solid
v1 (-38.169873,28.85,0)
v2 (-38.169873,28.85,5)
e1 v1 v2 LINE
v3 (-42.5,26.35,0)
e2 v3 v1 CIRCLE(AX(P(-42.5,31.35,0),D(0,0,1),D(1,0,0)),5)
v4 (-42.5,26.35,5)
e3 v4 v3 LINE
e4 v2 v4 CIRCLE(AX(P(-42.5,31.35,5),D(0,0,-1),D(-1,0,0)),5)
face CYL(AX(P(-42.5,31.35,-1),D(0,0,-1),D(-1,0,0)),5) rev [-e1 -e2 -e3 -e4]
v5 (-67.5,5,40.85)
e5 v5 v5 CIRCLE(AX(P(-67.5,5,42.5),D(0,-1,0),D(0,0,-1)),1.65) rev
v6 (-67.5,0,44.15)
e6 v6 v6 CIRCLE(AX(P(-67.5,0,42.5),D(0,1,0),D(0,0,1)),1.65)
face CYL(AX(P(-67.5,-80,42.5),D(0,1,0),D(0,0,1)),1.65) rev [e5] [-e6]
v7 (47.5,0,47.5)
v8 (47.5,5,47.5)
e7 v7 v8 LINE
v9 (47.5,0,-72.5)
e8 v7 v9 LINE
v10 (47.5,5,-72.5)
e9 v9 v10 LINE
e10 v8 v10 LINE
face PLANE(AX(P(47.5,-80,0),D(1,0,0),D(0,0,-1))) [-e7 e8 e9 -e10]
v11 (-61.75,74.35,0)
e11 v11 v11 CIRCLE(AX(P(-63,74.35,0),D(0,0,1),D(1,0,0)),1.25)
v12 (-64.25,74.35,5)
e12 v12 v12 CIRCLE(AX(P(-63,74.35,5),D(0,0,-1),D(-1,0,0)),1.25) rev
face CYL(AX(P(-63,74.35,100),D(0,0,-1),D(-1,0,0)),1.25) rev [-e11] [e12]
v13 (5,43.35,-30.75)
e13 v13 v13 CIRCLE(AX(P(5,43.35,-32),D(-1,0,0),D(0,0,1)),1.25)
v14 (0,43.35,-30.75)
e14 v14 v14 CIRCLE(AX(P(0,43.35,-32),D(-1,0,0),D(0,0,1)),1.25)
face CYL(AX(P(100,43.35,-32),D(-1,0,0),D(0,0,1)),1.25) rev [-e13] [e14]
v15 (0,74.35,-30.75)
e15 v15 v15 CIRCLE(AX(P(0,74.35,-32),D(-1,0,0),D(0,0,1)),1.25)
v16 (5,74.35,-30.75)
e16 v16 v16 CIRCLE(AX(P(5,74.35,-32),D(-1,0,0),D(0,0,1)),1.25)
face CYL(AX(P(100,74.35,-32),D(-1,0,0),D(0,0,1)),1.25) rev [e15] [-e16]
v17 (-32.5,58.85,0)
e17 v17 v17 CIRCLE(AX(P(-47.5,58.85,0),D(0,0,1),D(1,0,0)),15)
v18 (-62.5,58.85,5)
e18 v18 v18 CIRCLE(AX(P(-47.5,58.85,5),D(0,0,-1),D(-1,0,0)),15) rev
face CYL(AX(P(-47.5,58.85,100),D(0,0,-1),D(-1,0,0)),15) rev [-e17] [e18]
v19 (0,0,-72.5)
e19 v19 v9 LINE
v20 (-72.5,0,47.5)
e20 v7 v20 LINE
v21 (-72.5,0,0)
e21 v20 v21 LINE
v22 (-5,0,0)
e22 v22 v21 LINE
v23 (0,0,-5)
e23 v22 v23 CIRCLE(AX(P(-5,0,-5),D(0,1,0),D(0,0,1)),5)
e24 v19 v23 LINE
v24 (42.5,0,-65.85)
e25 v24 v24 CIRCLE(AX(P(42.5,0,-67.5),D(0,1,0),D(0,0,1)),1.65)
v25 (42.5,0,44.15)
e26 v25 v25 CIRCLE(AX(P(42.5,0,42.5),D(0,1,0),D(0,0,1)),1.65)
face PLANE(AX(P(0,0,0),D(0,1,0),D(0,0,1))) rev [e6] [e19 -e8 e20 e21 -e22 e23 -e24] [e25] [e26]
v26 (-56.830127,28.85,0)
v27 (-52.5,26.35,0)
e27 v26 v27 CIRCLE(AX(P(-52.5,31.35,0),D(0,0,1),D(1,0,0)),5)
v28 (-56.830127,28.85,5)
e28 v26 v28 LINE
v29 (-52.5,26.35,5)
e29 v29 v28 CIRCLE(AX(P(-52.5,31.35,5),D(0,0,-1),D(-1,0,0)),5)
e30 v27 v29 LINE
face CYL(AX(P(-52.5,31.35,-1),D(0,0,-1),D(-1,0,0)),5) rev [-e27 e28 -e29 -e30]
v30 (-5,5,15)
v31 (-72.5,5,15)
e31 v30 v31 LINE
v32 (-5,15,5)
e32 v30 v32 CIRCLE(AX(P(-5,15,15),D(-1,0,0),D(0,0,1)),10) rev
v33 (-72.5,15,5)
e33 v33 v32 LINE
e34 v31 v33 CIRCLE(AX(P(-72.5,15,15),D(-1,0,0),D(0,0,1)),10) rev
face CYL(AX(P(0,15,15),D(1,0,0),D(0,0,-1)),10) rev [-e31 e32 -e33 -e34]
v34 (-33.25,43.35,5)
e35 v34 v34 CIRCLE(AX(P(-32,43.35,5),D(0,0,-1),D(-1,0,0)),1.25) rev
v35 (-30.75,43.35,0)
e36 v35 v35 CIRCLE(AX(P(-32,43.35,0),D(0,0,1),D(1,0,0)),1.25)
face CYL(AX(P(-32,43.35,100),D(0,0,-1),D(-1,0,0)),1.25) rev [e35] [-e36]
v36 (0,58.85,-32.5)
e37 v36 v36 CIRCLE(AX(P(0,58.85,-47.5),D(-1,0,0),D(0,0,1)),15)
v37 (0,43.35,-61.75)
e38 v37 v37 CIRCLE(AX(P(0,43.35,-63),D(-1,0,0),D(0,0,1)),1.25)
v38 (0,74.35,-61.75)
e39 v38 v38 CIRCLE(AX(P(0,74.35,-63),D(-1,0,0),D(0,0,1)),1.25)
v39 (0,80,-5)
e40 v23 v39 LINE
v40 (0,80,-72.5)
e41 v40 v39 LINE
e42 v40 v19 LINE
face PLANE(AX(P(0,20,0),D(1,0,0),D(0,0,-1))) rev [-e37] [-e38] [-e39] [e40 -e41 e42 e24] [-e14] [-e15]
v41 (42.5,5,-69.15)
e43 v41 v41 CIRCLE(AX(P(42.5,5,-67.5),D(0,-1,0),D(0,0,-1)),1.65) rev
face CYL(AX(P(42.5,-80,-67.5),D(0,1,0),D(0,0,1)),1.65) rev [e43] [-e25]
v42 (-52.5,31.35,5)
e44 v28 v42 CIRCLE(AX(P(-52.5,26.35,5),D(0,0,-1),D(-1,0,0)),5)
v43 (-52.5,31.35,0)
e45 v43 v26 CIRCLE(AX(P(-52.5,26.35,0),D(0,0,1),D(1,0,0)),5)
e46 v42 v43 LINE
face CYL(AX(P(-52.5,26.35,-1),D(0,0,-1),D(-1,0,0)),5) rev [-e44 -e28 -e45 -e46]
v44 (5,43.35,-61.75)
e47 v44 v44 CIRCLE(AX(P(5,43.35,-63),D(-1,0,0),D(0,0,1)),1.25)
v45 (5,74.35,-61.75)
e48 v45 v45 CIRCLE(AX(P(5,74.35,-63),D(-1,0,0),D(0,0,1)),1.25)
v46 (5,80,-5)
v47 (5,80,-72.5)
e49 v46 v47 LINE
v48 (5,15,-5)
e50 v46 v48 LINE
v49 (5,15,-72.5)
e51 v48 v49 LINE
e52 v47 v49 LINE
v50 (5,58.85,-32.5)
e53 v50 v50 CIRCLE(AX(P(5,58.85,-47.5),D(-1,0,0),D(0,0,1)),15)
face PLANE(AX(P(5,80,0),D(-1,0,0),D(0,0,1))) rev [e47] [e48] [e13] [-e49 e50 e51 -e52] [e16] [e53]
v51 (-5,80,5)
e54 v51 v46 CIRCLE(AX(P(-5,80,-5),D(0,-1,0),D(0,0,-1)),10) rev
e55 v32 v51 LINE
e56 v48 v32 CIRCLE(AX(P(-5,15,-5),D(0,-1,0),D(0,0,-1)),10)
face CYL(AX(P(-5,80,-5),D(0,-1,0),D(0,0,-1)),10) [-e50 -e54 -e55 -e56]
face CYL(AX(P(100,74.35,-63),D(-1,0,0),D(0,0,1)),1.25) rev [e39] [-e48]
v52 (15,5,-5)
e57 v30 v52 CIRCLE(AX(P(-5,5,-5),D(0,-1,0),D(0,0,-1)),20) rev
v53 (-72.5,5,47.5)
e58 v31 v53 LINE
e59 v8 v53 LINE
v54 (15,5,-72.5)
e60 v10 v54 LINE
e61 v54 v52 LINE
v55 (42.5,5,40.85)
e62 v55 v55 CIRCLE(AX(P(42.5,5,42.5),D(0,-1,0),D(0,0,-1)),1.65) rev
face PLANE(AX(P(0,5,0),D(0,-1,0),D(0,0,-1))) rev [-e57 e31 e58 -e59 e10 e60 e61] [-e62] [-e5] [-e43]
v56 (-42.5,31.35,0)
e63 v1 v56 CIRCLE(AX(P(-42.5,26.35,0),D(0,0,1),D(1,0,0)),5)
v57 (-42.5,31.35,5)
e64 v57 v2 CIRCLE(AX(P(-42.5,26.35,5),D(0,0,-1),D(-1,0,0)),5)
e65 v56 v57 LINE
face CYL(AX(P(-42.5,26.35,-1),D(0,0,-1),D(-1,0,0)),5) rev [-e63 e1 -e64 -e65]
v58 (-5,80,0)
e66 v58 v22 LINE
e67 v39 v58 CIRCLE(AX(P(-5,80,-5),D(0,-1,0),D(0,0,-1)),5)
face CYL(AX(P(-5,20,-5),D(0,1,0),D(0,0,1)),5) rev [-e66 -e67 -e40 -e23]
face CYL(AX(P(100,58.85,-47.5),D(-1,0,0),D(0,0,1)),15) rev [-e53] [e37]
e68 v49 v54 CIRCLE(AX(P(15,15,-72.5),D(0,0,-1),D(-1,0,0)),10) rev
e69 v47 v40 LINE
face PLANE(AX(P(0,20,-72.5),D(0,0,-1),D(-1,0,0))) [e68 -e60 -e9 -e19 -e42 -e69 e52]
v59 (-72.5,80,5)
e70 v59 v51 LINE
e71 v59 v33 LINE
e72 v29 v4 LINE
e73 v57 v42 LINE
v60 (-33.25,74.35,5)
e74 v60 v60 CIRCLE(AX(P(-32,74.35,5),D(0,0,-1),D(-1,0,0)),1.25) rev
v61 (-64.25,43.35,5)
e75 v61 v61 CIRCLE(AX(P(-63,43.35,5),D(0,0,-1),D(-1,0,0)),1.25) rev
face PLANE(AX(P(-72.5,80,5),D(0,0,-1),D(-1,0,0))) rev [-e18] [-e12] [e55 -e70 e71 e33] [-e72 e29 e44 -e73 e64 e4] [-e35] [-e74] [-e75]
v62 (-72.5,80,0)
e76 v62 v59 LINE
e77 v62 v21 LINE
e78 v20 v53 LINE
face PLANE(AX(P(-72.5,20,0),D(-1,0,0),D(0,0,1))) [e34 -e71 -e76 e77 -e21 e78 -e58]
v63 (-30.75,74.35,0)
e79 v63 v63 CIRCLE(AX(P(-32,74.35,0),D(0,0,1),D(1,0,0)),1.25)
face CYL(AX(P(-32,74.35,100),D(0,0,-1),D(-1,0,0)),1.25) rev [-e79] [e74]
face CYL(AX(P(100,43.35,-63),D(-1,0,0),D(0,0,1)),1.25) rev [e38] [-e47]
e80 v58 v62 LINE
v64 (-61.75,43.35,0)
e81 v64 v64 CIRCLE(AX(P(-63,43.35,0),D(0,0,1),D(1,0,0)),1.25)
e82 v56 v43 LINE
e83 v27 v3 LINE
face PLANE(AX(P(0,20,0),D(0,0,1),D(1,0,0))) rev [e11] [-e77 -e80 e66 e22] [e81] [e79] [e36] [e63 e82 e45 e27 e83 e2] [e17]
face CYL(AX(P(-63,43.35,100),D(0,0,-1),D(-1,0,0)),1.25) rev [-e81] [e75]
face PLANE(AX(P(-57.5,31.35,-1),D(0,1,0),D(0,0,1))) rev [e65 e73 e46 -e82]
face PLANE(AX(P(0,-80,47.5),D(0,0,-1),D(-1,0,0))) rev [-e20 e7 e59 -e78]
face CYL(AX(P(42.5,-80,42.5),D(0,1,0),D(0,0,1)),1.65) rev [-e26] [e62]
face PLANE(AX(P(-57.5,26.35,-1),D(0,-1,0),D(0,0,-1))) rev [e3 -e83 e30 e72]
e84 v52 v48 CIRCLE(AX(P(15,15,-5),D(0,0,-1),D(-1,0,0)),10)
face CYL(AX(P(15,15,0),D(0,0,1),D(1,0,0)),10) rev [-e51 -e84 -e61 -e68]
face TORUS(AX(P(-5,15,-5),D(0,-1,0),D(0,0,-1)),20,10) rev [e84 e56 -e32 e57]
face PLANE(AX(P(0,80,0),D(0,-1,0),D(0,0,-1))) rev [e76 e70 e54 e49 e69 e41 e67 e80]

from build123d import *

# Parameters (mm, degrees)
BOSS_EXTRUDE1_DEPTH = 20
SKETCH2_W           = 5
SKETCH2_H           = 72.5
BOSS_EXTRUDE2_DEPTH = 60
SKETCH3_R           = 15
CUT_EXTRUDE1_DEPTH  = 100
SKETCH4_R           = 1.25
CUT_EXTRUDE2_DEPTH  = 100
SKETCH7_W           = 77.5
SKETCH7_H           = 5
BOSS_EXTRUDE6_DEPTH = 60
FILLET3_R           = 5
SKETCH8_W           = 25
SKETCH8_H           = 120
SKETCH8_H_2         = 25
SKETCH8_W_2         = 120
CUT_EXTRUDE3_DEPTH  = 100
SKETCH9_R           = 1.65
CUT_EXTRUDE4_DEPTH  = 100
SKETCH10_W          = 42.5
SKETCH10_H          = 42.5
SKETCH10_W_2        = 77.5
SKETCH10_H_2        = 77.5
CUT_EXTRUDE5_DEPTH  = 15
FILLET4_R           = 10
SKETCH11_W          = 20
SKETCH11_H          = 5
CUT_EXTRUDE6_DEPTH  = 6
FILLET5_R           = 5


with BuildPart() as part:
    # Sketch1 → Boss-Extrude1 (new body)
    with BuildSketch(Plane(origin=(0, 0, 0), x_dir=(1, 0, 0), z_dir=(0, 1, 0))):
        Polygon((72.5, 72.5), (0, 72.5), (0, 0), (-72.5, 0), (-72.5, -72.5), (72.5, -72.5), align=None)
    extrude(amount=BOSS_EXTRUDE1_DEPTH)

    # Sketch2 → Boss-Extrude2 (add)
    with BuildSketch(Plane(origin=(0, 20, 0), x_dir=(1, 0, 0), z_dir=(0, 1, 0))):
        with Locations((2.5, 36.25)):
            Rectangle(SKETCH2_W, SKETCH2_H)
    extrude(amount=BOSS_EXTRUDE2_DEPTH)

    # Sketch3 → Cut-Extrude1 (cut)
    with BuildSketch(Plane.ZY):
        with Locations((-47.5, 58.85)):
            Circle(SKETCH3_R)
    cut_extrude1 = extrude(amount=-CUT_EXTRUDE1_DEPTH, mode=Mode.SUBTRACT)

    # Sketch4 → Cut-Extrude2 (cut)
    with BuildSketch(Plane.ZY):
        with Locations((-32, 74.35)):
            Circle(SKETCH4_R)
        with Locations((-63, 74.35)):
            Circle(SKETCH4_R)
        with Locations((-63, 43.35)):
            Circle(SKETCH4_R)
        with Locations((-32, 43.35)):
            Circle(SKETCH4_R)
    cut_extrude2 = extrude(amount=-CUT_EXTRUDE2_DEPTH, mode=Mode.SUBTRACT)

    # Sketch7 → Boss-Extrude6 (add)
    with BuildSketch(Plane(origin=(0, 20, 0), x_dir=(1, 0, 0), z_dir=(0, 1, 0))):
        with Locations((-33.75, -2.5)):
            Rectangle(SKETCH7_W, SKETCH7_H)
    extrude(amount=BOSS_EXTRUDE6_DEPTH)

    # Mirror5: Cut-Extrude1, Cut-Extrude2 across plane
    add(cut_extrude1.mirror(Plane(origin=(0, 0, 0), x_dir=(0.7071067811865476, 0, 0.7071067811865475), z_dir=(-0.7071067811865475, 0, 0.7071067811865476))), mode=Mode.SUBTRACT)
    add(cut_extrude2.mirror(Plane(origin=(0, 0, 0), x_dir=(0.7071067811865476, 0, 0.7071067811865475), z_dir=(-0.7071067811865475, 0, 0.7071067811865476))), mode=Mode.SUBTRACT)

    # Fillet3
    fillet3_edges = [part.edges().sort_by_distance(p)[0] for p in [
        (0, 40, 0),
    ]]
    fillet(fillet3_edges, radius=FILLET3_R)

    # Sketch8 → Cut-Extrude3 (cut)
    with BuildSketch(Plane(origin=(0, 20, 0), x_dir=(1, 0, 0), z_dir=(0, 1, 0))):
        with Locations((60, 12.5)):
            Rectangle(SKETCH8_W, SKETCH8_H)
        with Locations((60, -60)):
            Rectangle(SKETCH8_W, SKETCH8_H_2)
        with Locations((-12.5, -60)):
            Rectangle(SKETCH8_W_2, SKETCH8_H_2)
    extrude(amount=-CUT_EXTRUDE3_DEPTH, mode=Mode.SUBTRACT)

    # Sketch9 → Cut-Extrude4 (cut)
    with BuildSketch(Plane(origin=(0, 20, 0), x_dir=(1, 0, 0), z_dir=(0, 1, 0))):
        with Locations(Location((42.5, 67.5, 0), (0, 0, 270))):
            Circle(SKETCH9_R)
        with Locations(Location((42.5, -42.5, 0), (0, 0, 270))):
            Circle(SKETCH9_R)
        with Locations(Location((-67.5, -42.5, 0), (0, 0, 270))):
            Circle(SKETCH9_R)
    extrude(amount=-CUT_EXTRUDE4_DEPTH, mode=Mode.SUBTRACT)

    # Sketch10 → Cut-Extrude5 (cut)
    with BuildSketch(Plane(origin=(0, 20, 0), x_dir=(1, 0, 0), z_dir=(0, 1, 0))):
        with Locations((26.25, -26.25)):
            Rectangle(SKETCH10_W, SKETCH10_H)
        with Locations((-33.75, -26.25)):
            Rectangle(SKETCH10_W_2, SKETCH10_H)
        with Locations((26.25, 33.75)):
            Rectangle(SKETCH10_W, SKETCH10_H_2)
    extrude(amount=-CUT_EXTRUDE5_DEPTH, mode=Mode.SUBTRACT)

    # Fillet4
    fillet4_edges = [part.edges().sort_by_distance(p)[0] for p in [
        (5, 5, -33.75),
        (-33.75, 5, 5),
        (5, 42.5, 5),
    ]]
    fillet(fillet4_edges, radius=FILLET4_R)

    # Sketch11 → Cut-Extrude6 (cut)
    with BuildSketch(Plane.XY.offset(5)):
        with Locations((-47.5, 28.85)):
            Rectangle(SKETCH11_W, SKETCH11_H)
    extrude(amount=-CUT_EXTRUDE6_DEPTH, mode=Mode.SUBTRACT)

    # Fillet5
    # the kernel refuses this fillet: 5 mm, written as the material it adds along each edge
    with BuildSketch(Plane(origin=(-57.5, 26.35, 5), x_dir=(1, 0, 0), z_dir=(0, 0, -1))) as fillet5_piece_1:
        with BuildLine():
            CenterArc((FILLET5_R, -FILLET5_R), FILLET5_R, 90, 90)
            Line((0, -FILLET5_R), (0, 0))
            Line((0, 0), (FILLET5_R, 0))
        make_face()
    extrude(amount=5)
    with BuildSketch(Plane(origin=(-57.5, 31.35, 5), x_dir=(1, 0, 0), z_dir=(0, 0, -1)), Plane(origin=(-37.5, 31.35, 5), x_dir=(0, -1, 0), z_dir=(0, 0, -1)), Plane(origin=(-37.5, 26.35, 5), x_dir=(-1, 0, 0), z_dir=(0, 0, -1))) as fillet5_piece_2:
        with BuildLine():
            CenterArc((FILLET5_R, FILLET5_R), FILLET5_R, 180, 90)
            Line((0, FILLET5_R), (0, 0))
            Line((0, 0), (FILLET5_R, 0))
        make_face()
    extrude(amount=5)


solid = part.part
